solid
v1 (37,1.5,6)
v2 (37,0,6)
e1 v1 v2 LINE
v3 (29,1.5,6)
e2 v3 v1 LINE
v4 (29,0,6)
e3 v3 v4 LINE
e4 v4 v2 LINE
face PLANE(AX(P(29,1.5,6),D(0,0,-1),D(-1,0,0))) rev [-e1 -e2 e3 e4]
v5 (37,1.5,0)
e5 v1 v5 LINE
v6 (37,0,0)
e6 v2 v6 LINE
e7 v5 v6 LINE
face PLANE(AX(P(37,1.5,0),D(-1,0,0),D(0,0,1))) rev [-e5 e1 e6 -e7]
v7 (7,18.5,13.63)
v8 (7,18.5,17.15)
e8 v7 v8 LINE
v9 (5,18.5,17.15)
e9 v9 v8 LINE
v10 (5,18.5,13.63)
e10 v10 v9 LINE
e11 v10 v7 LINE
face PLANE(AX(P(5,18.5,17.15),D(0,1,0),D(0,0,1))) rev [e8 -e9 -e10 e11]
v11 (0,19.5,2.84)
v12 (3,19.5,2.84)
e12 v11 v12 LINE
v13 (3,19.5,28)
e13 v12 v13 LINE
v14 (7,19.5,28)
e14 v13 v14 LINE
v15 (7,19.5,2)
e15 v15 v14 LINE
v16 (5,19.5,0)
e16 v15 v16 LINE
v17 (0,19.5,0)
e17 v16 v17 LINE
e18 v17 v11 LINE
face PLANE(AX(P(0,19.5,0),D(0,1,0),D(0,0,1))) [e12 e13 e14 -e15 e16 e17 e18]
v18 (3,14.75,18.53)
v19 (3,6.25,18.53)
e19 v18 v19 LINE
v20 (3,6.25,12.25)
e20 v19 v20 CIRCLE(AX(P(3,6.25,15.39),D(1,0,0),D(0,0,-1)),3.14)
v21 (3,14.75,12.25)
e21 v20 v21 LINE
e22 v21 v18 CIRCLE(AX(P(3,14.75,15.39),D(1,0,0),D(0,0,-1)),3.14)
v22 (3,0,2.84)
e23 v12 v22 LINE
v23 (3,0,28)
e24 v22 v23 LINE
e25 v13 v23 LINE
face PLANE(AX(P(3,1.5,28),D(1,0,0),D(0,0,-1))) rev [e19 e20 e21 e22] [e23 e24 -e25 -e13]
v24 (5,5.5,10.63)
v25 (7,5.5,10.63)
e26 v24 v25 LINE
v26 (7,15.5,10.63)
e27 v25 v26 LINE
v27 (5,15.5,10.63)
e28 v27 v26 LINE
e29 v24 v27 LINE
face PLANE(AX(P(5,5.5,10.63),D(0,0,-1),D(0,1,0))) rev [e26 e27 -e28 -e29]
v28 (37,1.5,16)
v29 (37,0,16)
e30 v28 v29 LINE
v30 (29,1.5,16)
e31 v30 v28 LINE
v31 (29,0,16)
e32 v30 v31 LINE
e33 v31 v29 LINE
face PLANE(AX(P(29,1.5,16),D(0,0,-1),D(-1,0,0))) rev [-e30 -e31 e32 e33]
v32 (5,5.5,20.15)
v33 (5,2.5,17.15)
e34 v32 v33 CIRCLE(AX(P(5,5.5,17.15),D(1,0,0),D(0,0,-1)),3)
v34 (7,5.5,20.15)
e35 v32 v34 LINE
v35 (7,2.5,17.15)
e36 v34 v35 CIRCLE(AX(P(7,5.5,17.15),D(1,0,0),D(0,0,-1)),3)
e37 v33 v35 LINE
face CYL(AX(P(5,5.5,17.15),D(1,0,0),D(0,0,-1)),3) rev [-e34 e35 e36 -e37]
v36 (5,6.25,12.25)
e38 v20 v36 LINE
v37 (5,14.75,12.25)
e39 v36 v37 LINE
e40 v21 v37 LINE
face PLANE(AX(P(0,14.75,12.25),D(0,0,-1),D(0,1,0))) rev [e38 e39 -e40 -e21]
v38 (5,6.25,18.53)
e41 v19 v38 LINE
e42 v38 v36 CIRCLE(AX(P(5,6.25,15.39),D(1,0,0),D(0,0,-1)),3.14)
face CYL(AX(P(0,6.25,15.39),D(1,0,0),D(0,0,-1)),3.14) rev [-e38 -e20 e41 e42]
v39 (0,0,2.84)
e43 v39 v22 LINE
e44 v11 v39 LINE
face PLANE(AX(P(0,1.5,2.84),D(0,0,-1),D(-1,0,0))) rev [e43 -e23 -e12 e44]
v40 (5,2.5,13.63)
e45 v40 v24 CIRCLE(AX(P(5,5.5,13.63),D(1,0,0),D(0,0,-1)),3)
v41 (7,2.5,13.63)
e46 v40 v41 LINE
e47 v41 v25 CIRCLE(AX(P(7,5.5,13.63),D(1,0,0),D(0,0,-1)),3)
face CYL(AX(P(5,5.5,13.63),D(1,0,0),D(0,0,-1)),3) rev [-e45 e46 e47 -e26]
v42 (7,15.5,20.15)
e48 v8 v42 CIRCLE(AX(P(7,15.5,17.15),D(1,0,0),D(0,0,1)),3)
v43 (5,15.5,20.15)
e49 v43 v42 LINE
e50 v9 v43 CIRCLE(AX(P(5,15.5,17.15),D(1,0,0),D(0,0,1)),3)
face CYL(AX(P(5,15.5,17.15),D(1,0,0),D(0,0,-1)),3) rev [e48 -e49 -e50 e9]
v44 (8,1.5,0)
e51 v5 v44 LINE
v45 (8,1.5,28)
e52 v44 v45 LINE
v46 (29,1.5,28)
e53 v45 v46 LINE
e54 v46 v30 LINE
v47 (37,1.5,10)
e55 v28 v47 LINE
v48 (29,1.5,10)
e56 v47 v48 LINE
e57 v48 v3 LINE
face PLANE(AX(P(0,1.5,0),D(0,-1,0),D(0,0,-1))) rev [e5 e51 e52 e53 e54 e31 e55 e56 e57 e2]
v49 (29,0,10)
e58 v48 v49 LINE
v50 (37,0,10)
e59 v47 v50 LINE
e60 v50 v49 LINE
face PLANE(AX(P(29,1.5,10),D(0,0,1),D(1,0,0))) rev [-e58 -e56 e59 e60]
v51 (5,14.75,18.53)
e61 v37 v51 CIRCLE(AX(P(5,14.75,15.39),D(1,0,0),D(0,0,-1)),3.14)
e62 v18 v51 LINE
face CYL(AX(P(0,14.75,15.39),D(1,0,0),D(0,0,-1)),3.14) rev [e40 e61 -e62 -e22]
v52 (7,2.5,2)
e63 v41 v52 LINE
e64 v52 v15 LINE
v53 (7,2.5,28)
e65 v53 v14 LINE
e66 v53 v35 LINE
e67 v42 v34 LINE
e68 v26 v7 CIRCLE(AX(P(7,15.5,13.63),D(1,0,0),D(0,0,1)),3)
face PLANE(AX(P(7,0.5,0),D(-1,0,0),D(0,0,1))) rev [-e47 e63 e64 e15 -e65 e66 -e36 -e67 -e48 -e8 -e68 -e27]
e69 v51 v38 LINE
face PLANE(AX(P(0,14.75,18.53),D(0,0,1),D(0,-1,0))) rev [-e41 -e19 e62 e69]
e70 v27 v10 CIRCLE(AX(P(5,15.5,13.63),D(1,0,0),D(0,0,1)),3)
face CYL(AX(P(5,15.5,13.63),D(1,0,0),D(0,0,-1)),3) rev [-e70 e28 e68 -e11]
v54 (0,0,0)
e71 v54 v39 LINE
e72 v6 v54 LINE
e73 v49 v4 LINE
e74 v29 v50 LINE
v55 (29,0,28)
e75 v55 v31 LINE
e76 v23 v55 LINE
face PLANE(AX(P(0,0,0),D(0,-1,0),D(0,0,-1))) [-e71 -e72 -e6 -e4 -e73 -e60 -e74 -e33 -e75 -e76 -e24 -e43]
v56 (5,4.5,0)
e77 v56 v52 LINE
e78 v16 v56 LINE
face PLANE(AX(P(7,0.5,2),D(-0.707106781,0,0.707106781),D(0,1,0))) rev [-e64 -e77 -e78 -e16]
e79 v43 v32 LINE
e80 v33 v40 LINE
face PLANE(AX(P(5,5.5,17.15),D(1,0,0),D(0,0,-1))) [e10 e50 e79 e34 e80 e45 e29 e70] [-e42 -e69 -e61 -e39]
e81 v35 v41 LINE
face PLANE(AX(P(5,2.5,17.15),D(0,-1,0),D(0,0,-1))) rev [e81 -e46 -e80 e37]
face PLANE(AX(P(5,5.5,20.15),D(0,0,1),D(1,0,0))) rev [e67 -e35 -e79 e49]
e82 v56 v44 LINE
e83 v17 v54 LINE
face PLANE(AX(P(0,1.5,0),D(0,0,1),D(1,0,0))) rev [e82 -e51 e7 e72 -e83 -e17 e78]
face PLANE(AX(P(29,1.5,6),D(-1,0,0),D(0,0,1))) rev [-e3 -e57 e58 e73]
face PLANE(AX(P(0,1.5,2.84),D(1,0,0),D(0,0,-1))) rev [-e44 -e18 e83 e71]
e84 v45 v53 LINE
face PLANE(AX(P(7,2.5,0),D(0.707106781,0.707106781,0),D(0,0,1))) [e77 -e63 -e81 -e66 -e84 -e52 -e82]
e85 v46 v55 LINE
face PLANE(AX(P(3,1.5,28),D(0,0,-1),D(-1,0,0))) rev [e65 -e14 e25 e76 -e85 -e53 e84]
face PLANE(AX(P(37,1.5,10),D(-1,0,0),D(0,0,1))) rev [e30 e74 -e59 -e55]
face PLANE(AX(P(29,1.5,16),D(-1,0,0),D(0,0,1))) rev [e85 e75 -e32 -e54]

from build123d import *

# Parameters (mm, degrees)
BOSS_EXTRUDE1_DEPTH      = 1.5
BOSS_EXTRUDE2_DEPTH      = 18
BOSS_EXTRUDE2_DEPTH_BACK = 1
CUT_EXTRUDE2_DEPTH       = 2
CUT_EXTRUDE3_DEPTH       = 47.778734485
CHAMFER1_SIZE            = 1
CHAMFER2_SIZE            = 2


with BuildPart() as part:
    # Sketch1 → Boss-Extrude1 (new body)
    with BuildSketch(Plane(origin=(0, 0, 0), x_dir=(1, 0, 0), z_dir=(0, 1, 0))):
        Polygon((0, -2.84), (0, 0), (37, 0), (37, -6), (29, -6), (29, -10), (37, -10), (37, -16), (29, -16), (29, -28), (3, -28), (3, -2.84), align=None)
    extrude(amount=BOSS_EXTRUDE1_DEPTH)

    # Sketch2 → Boss-Extrude2 (add, two sides: drawn at the far end of the back side and taken through both)
    with BuildSketch(Plane(origin=(0, 1.5, 0), x_dir=(1, 0, 0), z_dir=(0, 1, 0)).offset(-BOSS_EXTRUDE2_DEPTH_BACK)):
        Polygon((7, 0), (0, 0), (0, -2.84), (3, -2.84), (3, -28), (7, -28), align=None)
    extrude(amount=BOSS_EXTRUDE2_DEPTH + BOSS_EXTRUDE2_DEPTH_BACK)

    # Sketch4 → Cut-Extrude2 (cut)
    with BuildSketch(Plane(origin=(7, 0, 0), x_dir=(0, 0, -1), z_dir=(1, 0, 0))):
        with BuildLine():
            Line((-17.15, 2.5), (-13.63, 2.5))
            ThreePointArc((-13.63, 2.5), (-11.508679656, 3.378679656), (-10.63, 5.5))
            Line((-10.63, 5.5), (-10.63, 15.5))
            ThreePointArc((-10.63, 15.5), (-11.508679656, 17.621320344), (-13.63, 18.5))
            Line((-13.63, 18.5), (-17.15, 18.5))
            ThreePointArc((-17.15, 18.5), (-19.271320344, 17.621320344), (-20.15, 15.5))
            Line((-20.15, 15.5), (-20.15, 5.5))
            ThreePointArc((-20.15, 5.5), (-19.271320344, 3.378679656), (-17.15, 2.5))
        make_face()
    extrude(amount=-CUT_EXTRUDE2_DEPTH, mode=Mode.SUBTRACT)

    # Sketch5 → Cut-Extrude3 (cut, through all)
    with BuildSketch(Plane(origin=(5, 0, 0), x_dir=(0, 0, -1), z_dir=(1, 0, 0))):
        with BuildLine():
            Line((-12.25, 14.75), (-12.25, 6.25))
            ThreePointArc((-12.25, 6.25), (-15.39, 3.11), (-18.53, 6.25))
            Line((-18.53, 6.25), (-18.53, 14.75))
            ThreePointArc((-18.53, 14.75), (-15.39, 17.89), (-12.25, 14.75))
        make_face()
    extrude(amount=-CUT_EXTRUDE3_DEPTH, mode=Mode.SUBTRACT)

    # Chamfer1
    chamfer1_edges = [part.edges().sort_by_distance(p)[0] for p in [
        (7, 1.5, 14),
    ]]
    chamfer(chamfer1_edges, length=CHAMFER1_SIZE - 0.0001)  # a hair under: the kernel refuses the full size

    # Chamfer2
    chamfer2_edges = [part.edges().sort_by_distance(p)[0] for p in [
        (7, 10.99995, 0),
    ]]
    chamfer(chamfer2_edges, length=CHAMFER2_SIZE)


solid = part.part
